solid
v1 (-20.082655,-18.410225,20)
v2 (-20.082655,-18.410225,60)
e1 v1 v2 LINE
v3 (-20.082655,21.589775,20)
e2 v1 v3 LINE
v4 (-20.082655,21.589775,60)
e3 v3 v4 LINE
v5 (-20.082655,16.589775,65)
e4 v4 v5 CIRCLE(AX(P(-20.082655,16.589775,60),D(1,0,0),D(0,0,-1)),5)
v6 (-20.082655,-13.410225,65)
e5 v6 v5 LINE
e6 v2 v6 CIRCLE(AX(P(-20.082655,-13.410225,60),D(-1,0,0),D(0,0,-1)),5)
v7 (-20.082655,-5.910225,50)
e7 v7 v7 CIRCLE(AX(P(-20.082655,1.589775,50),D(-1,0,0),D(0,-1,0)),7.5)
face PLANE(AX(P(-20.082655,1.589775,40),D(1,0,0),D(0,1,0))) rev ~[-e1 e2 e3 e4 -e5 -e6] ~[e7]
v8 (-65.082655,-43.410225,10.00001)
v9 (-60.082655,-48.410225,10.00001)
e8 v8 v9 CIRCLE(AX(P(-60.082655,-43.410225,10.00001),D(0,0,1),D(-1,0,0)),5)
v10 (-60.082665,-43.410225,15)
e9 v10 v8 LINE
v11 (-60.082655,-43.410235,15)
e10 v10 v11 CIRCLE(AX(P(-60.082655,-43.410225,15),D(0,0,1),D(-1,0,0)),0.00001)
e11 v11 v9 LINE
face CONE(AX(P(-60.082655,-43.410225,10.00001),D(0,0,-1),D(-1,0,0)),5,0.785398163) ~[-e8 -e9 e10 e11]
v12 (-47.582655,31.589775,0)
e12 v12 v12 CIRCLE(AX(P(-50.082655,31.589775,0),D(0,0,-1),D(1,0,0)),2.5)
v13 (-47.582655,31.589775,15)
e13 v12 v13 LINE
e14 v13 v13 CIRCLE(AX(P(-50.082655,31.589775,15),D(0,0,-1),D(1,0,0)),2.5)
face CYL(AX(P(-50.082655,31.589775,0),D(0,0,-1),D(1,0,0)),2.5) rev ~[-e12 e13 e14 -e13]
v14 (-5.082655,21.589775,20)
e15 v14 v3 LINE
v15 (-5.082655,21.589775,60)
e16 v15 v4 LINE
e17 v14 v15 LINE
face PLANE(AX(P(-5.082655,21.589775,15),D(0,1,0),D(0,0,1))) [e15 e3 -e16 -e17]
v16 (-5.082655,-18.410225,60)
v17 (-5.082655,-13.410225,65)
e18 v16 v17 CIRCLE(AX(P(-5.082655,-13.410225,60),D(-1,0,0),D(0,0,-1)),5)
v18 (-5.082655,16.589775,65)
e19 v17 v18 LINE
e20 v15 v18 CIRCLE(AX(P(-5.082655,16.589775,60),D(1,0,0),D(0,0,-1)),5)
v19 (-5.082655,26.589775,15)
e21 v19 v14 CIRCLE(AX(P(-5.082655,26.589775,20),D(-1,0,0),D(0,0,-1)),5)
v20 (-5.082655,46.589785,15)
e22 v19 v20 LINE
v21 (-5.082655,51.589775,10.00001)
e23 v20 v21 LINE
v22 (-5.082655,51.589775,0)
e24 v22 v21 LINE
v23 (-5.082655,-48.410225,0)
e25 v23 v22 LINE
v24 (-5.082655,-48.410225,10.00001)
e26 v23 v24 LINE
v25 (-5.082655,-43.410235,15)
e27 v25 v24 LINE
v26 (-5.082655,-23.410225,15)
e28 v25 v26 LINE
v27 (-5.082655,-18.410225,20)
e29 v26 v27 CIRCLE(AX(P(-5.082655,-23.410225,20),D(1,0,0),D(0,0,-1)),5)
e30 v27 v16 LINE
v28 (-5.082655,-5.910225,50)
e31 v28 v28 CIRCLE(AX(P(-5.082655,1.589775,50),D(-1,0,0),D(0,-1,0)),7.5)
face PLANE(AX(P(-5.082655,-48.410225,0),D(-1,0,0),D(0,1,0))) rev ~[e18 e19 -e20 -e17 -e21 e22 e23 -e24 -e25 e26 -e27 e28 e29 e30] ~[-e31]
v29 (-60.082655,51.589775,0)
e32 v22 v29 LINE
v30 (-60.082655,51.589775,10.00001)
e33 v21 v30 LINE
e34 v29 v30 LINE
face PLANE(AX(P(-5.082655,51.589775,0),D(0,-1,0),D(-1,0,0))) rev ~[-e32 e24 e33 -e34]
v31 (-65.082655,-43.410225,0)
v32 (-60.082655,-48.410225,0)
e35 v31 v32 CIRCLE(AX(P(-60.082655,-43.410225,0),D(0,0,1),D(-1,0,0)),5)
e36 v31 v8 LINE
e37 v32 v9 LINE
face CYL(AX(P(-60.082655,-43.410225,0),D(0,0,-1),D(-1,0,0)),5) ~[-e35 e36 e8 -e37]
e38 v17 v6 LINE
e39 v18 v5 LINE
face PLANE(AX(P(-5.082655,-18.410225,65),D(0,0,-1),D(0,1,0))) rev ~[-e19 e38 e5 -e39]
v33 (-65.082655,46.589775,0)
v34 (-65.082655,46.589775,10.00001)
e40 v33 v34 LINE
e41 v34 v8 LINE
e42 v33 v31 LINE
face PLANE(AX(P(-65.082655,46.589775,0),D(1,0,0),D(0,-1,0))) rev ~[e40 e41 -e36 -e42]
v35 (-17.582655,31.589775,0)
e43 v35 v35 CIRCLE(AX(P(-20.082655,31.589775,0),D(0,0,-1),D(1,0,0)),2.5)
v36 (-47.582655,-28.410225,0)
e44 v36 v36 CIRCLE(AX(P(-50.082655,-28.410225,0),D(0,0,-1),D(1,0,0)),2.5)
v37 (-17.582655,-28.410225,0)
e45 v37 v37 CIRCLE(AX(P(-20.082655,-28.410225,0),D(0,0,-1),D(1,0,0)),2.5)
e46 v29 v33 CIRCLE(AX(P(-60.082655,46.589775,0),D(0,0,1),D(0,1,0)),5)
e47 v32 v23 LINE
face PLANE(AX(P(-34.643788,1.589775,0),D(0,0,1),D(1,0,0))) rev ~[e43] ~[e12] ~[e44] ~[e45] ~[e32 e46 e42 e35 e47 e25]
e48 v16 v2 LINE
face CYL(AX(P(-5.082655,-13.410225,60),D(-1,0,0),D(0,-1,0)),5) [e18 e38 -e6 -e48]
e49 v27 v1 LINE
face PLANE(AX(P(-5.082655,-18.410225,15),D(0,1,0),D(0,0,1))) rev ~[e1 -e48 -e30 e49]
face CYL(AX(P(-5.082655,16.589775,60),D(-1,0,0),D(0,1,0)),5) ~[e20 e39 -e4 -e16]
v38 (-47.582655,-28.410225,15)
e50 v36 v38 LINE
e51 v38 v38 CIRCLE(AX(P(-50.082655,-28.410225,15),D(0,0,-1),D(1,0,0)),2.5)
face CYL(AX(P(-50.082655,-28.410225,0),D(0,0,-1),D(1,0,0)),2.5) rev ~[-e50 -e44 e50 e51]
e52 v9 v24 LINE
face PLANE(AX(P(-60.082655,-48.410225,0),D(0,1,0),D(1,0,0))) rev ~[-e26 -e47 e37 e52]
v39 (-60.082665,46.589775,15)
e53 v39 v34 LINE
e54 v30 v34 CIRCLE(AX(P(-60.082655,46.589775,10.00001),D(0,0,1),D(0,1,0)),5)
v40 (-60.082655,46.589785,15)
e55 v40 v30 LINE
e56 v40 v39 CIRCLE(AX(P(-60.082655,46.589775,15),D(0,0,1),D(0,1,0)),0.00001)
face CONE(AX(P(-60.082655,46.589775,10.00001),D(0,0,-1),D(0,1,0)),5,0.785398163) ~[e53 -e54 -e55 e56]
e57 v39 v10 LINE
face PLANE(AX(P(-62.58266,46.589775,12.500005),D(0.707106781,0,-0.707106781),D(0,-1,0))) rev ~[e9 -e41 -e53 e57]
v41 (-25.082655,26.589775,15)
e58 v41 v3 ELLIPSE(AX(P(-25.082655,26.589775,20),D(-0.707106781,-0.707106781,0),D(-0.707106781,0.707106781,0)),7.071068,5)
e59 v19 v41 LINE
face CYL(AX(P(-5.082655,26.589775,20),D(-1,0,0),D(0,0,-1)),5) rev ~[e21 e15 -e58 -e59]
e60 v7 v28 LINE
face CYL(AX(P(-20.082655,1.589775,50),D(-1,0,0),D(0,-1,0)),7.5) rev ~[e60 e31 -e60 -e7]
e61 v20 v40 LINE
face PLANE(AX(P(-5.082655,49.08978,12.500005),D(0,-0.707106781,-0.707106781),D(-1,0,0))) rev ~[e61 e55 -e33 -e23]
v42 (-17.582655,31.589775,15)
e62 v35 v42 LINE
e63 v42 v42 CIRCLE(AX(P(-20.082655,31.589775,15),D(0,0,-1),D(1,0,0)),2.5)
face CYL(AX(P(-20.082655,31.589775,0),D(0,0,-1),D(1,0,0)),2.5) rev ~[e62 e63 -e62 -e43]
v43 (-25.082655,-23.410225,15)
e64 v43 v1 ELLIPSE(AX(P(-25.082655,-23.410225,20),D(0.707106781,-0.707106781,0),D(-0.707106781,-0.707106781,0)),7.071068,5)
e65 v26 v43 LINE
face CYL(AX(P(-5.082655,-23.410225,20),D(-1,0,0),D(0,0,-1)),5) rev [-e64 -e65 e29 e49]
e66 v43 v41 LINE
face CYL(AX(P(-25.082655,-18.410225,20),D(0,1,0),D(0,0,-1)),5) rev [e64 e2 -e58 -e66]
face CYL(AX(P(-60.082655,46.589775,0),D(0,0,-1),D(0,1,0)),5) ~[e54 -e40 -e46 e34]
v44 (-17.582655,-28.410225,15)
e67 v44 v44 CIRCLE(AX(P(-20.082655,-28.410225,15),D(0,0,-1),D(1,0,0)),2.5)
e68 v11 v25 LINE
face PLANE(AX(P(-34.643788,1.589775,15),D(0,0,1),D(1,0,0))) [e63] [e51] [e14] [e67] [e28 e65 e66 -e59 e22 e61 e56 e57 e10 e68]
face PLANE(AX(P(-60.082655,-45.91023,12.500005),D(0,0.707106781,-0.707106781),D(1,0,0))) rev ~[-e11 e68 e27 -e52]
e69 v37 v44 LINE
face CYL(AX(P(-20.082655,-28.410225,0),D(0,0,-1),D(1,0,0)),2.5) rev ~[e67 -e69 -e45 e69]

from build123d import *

# Parameters (mm, degrees)
F1_DEPTH = 15
F2_W     = 40
F2_H     = 50
F3_DEPTH = 15
F4_R     = 5
F5_SIZE  = 4.99999
F6_R     = 7.5
F7_DEPTH = 25
F8_R     = 2.5
F9_DEPTH = 25


# Not quite as in the source:
# - a fillet or chamfer is up to 0.001 mm smaller than in the source, because OpenCascade refuses the exact size


with BuildPart() as f1:
    # F0 (on Top) → F1 (new body)
    with BuildSketch(Plane.XY):
        with BuildLine():
            Line((-5.0826547947, 51.5897747652), (-60.0826547947, 51.5897747652))
            ThreePointArc((-60.0826547947, 51.5897747652), (-63.6181887006, 50.1253086711), (-65.0826547947, 46.5897747652))
            Line((-65.0826547947, 46.5897747652), (-65.0826547947, -43.4102252348))
            ThreePointArc((-65.0826547947, -43.4102252348), (-63.6181887006, -46.9457591408), (-60.0826547947, -48.4102252348))
            Line((-60.0826547947, -48.4102252348), (-5.0826547947, -48.4102252348))
            Line((-5.0826547947, -48.4102252348), (-5.0826547947, 51.5897747652))
        make_face()
    extrude(amount=F1_DEPTH)

    # F2 (on face) → F3 (join)
    with BuildSketch(Plane.YZ.offset(-5.0826547947)):
        with Locations((1.5897747652, 40)):
            Rectangle(F2_W, F2_H)
    extrude(amount=-F3_DEPTH)

    # F4
    f4_edges = [f1.edges().sort_by_distance(p)[0] for p in [
        (-12.582655, 21.589775, 65),
        (-12.582655, -18.410225, 65),
        (-12.582655, -18.410225, 15),
        (-20.082655, 1.589775, 15),
        (-12.582655, 21.589775, 15),
    ]]
    fillet(f4_edges, radius=F4_R)

    # F5 (size 5 in the source; OpenCascade refuses exactly that, so slightly less here)
    f5_edges = [f1.edges().sort_by_distance(p)[0] for p in [
        (-32.582655, 51.589775, 15),
    ]]
    chamfer(f5_edges, length=F5_SIZE)

    # F6 (on face) → F7 (cut)
    with BuildSketch(Plane(origin=(-20.0826547947, 0, 0), x_dir=(0, -1, 0), z_dir=(-1, 0, 0))):
        with Locations((-1.5897747652, 50)):
            Circle(F6_R)
    extrude(amount=-F7_DEPTH, mode=Mode.SUBTRACT)

    # F8 (on face) → F9 (cut)
    with BuildSketch(Plane(origin=(0, 0, 0), x_dir=(1, 0, 0), z_dir=(0, 0, -1))):
        with Locations((-20.0826547947, -31.5897747652)):
            Circle(F8_R)
        with Locations((-50.0826547947, -31.5897747652)):
            Circle(F8_R)
        with Locations((-50.0826547947, 28.4102252348)):
            Circle(F8_R)
        with Locations((-20.0826547947, 28.4102252348)):
            Circle(F8_R)
    extrude(amount=-F9_DEPTH, mode=Mode.SUBTRACT)


solid = f1.part
